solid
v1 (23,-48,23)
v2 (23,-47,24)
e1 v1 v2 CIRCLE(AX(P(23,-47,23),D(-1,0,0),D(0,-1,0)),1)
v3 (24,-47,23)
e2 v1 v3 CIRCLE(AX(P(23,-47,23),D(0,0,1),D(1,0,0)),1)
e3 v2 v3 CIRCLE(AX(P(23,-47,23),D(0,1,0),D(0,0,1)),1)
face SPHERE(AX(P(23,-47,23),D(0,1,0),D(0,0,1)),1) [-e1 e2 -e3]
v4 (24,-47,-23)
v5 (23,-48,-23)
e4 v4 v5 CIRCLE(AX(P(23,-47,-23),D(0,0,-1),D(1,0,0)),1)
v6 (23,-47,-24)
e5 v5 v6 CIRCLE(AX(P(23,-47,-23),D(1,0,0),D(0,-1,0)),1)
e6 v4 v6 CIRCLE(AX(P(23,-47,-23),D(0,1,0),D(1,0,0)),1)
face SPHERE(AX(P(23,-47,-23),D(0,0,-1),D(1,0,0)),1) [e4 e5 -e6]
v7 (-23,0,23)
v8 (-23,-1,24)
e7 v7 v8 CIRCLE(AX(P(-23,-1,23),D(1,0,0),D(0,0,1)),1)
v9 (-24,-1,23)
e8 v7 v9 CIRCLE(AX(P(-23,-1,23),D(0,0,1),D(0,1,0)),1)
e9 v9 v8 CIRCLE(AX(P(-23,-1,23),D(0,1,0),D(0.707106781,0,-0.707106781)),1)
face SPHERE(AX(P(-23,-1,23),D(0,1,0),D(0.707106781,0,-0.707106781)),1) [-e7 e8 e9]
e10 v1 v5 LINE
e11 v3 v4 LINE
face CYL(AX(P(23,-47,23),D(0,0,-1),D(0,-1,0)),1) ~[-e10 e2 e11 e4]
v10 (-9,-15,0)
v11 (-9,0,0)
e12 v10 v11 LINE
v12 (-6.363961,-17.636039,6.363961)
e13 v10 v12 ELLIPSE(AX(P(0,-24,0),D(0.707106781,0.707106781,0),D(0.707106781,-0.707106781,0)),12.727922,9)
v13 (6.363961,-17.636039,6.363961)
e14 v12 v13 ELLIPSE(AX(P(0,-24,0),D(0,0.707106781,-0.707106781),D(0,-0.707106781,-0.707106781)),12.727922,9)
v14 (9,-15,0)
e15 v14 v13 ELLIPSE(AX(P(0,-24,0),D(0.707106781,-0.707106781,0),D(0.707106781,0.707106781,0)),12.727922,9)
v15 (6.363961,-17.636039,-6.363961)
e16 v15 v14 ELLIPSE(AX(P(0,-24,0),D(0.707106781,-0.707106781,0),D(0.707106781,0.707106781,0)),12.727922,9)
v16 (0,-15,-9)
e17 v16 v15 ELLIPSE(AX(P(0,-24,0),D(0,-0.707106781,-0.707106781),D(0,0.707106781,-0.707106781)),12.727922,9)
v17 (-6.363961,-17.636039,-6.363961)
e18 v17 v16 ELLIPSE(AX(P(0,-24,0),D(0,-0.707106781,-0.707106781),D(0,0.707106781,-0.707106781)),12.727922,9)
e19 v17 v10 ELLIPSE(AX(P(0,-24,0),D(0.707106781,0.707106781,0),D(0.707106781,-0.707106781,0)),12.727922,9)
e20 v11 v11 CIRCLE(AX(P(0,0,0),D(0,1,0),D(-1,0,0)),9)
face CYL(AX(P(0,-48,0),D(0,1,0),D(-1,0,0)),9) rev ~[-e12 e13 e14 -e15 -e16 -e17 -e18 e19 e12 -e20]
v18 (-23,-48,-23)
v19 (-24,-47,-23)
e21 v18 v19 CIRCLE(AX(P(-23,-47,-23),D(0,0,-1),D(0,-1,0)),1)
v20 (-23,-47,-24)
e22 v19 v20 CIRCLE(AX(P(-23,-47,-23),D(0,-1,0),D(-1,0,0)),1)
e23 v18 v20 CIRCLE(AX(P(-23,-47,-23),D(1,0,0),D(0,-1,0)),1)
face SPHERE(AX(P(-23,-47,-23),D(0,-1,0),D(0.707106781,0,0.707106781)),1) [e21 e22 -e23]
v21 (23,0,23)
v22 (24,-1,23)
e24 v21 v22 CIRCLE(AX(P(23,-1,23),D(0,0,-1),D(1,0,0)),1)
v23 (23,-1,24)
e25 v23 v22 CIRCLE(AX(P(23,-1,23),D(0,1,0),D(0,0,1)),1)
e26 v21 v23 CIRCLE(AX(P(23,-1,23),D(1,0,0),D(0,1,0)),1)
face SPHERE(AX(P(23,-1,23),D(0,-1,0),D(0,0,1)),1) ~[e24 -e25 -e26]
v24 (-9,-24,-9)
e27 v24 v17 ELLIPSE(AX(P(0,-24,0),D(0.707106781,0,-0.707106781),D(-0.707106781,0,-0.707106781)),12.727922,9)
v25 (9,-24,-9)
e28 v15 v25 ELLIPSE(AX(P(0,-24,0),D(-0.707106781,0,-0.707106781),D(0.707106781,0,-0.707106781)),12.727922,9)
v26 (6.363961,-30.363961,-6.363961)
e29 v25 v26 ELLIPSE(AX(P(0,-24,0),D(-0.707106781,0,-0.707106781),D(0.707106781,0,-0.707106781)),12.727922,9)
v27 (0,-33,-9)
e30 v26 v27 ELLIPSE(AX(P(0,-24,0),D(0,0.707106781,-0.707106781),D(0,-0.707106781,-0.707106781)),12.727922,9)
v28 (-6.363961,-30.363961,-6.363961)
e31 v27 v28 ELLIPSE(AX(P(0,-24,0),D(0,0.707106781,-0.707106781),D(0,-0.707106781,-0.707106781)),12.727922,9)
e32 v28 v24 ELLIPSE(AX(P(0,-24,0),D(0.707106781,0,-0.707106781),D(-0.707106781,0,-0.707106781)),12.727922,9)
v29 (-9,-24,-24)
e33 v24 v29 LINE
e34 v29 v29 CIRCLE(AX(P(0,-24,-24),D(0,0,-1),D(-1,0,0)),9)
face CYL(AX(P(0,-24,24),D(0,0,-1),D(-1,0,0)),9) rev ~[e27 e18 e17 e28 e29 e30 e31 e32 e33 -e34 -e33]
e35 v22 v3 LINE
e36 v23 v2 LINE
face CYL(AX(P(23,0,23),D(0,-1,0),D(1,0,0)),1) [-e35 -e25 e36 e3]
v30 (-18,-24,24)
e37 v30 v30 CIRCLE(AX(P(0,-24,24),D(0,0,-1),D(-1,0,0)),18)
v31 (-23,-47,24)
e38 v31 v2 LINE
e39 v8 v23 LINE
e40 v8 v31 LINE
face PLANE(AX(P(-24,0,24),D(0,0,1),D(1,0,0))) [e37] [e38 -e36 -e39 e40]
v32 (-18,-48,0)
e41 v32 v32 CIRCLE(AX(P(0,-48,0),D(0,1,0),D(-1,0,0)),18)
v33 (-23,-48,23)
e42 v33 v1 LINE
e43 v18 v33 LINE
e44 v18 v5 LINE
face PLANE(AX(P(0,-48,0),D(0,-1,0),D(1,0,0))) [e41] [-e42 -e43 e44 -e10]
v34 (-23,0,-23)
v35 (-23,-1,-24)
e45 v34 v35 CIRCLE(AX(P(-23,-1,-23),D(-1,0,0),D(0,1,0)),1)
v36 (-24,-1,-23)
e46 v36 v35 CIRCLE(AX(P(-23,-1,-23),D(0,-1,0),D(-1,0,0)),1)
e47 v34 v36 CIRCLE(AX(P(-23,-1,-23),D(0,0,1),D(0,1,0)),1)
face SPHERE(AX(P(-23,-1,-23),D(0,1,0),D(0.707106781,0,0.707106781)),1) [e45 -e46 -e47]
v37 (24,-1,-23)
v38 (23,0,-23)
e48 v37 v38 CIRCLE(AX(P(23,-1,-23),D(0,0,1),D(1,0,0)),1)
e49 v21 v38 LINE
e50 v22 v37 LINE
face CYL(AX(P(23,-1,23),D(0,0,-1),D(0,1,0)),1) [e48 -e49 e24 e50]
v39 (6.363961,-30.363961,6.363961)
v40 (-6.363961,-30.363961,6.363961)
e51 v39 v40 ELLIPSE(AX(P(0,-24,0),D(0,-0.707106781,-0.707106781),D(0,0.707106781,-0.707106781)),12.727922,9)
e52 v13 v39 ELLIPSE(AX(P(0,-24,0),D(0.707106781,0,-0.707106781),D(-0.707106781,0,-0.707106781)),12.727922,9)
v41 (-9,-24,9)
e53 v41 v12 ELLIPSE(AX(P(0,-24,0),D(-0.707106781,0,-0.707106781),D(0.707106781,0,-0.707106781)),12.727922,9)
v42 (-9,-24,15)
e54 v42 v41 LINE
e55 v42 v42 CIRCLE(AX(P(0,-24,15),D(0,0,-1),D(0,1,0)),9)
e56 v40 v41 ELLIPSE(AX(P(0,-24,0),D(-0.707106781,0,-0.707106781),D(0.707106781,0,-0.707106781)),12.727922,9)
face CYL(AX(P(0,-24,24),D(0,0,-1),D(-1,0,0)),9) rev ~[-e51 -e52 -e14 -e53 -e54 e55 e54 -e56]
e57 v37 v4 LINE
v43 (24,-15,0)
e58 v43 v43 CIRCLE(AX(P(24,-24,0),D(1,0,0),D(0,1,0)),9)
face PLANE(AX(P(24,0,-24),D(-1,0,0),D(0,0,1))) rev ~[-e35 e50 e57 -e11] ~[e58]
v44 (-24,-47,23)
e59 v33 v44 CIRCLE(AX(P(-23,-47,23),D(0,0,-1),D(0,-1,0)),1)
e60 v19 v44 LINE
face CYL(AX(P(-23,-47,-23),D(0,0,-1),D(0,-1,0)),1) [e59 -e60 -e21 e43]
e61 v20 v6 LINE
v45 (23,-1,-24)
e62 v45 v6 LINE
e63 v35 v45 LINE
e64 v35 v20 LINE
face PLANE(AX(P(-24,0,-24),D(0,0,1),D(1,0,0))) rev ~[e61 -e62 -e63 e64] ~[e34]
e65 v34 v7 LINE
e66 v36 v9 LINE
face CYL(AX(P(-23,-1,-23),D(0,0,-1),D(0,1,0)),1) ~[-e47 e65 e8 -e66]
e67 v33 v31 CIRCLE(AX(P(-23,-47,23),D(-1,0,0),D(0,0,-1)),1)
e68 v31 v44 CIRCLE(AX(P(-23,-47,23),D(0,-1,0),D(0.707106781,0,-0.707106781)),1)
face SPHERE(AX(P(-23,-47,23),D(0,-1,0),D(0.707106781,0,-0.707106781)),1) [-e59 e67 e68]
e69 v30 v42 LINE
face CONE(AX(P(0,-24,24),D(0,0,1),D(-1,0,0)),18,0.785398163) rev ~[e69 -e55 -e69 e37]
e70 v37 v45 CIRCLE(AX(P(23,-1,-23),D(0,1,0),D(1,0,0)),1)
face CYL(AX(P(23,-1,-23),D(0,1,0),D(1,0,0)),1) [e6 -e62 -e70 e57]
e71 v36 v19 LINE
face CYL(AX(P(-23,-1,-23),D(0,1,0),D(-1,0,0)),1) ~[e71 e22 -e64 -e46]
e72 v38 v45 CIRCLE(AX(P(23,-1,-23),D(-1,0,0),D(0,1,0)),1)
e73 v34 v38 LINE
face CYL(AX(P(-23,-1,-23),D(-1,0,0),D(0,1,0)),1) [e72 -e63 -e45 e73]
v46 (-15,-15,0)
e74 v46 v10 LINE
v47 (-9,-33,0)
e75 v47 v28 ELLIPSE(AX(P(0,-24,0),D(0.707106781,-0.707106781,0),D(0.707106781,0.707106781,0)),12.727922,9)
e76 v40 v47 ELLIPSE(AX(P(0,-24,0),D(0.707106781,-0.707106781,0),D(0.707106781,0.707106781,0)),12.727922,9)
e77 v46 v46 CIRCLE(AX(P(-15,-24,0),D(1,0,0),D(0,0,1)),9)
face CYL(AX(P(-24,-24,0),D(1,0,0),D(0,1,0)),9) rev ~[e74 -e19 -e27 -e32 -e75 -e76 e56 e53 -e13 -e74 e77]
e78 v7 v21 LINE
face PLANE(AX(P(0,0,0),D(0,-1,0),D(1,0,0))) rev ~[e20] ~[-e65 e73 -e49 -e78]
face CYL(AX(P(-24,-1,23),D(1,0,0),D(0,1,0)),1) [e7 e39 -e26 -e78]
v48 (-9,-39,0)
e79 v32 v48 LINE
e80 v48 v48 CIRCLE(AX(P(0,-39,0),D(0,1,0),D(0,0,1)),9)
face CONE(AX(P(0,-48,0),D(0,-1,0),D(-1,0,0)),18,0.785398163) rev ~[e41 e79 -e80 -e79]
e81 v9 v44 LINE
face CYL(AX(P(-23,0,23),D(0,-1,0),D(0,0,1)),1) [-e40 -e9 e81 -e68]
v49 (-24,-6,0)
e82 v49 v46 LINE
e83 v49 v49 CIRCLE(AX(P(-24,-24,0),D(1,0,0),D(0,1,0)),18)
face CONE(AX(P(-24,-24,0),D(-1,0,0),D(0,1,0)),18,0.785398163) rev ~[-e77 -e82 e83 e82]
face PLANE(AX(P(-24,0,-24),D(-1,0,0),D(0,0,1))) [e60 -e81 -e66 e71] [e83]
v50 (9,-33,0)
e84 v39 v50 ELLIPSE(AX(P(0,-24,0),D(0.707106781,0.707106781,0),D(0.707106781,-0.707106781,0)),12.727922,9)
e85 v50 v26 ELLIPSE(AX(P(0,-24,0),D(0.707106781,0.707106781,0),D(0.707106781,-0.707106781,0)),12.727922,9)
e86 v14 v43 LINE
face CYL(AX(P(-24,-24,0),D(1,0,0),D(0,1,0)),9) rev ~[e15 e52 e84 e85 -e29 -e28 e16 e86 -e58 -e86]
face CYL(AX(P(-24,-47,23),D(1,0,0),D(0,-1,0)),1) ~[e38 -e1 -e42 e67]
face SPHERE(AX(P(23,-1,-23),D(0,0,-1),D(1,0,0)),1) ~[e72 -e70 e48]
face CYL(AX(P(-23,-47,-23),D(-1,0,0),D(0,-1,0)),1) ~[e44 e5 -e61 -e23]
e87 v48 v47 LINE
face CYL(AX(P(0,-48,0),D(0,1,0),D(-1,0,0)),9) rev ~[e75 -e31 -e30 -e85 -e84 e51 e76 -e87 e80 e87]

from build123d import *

# Parameters (mm, degrees)
F0_W            = 48
F0_H            = 48
F1_DEPTH        = 48
F2_R            = 1
F3_R            = 1
F4_T1_DEPTH     = 46
F4_T3_DEPTH     = 46
F4_T5_DEPTH     = 46
F4_S9_W         = 1
F4_S9_H         = 1
F4_T10_DEPTH    = 1
F4_S15_W        = 1
F4_S15_H        = 1
F4_T16_DEPTH    = 1
F4_S21_W        = 1
F4_S21_H        = 1
F4_T22_DEPTH    = 1
F4_S27_W        = 1
F4_S27_H        = 1
F4_T28_DEPTH    = 1
F4_T32_ANGLE    = 90
F4_T34_ANGLE    = 90
F6_D            = 18
F6_CSINK_D      = 36
F6_CSINK_ANGLE  = 90
F8_D            = 18
F8_CSINK_D      = 36
F8_CSINK_ANGLE  = 90
F10_D           = 18
F10_CSINK_D     = 36
F10_CSINK_ANGLE = 90


# Not quite as in the source:
# - a fillet or chamfer that OpenCascade refuses, or shapes differently, is made with other operations: its cross-section is extruded or revolved along the edge and cut away or added


with BuildPart() as f1:
    # F0 (on Front) → F1 (new body)
    with BuildSketch(Plane.XZ):
        Rectangle(F0_W, F0_H)
    extrude(amount=F1_DEPTH)

    # F2
    f2_edges = [f1.edges().sort_by_distance(p)[0] for p in [
        (24, -24, 24),
    ]]
    fillet(f2_edges, radius=F2_R)

    # F3
    f3_edges = [f1.edges().sort_by_distance(p)[0] for p in [
        (-24, -24, 24),
        (-0.5, 0, 24),
        (-0.5, -48, 24),
    ]]
    fillet(f3_edges, radius=F3_R)

    # F4: fillet of radius 1 on 8 edges, made by hand

    # F4_s2 → F4_t1 (cut)
    with BuildSketch(Plane.XY.offset(-23)):
        with BuildLine():
            ThreePointArc((-23, -48), (-23.7071067812, -47.7071067812), (-24, -47))
            Line((-24, -47), (-24, -48))
            Line((-24, -48), (-23, -48))
        make_face()
        with BuildLine():
            ThreePointArc((-23, 0), (-23.7071067812, -0.2928932188), (-24, -1))
            Line((-24, -1), (-24, 0))
            Line((-24, 0), (-23, 0))
        make_face()
    extrude(amount=F4_T1_DEPTH, mode=Mode.SUBTRACT)

    # F4_s4 → F4_t3 (cut)
    with BuildSketch(Plane.YZ.offset(-23)):
        with BuildLine():
            ThreePointArc((0, -23), (-0.2928932188, -23.7071067812), (-1, -24))
            Line((-1, -24), (0, -24))
            Line((0, -24), (0, -23))
        make_face()
        with BuildLine():
            ThreePointArc((-48, -23), (-47.7071067812, -23.7071067812), (-47, -24))
            Line((-47, -24), (-48, -24))
            Line((-48, -24), (-48, -23))
        make_face()
    extrude(amount=F4_T3_DEPTH, mode=Mode.SUBTRACT)

    # F4_s6 → F4_t5 (cut)
    with BuildSketch(Plane.XZ.offset(1)):
        with BuildLine():
            ThreePointArc((-24, -23), (-23.7071067812, -23.7071067812), (-23, -24))
            Line((-23, -24), (-24, -24))
            Line((-24, -24), (-24, -23))
        make_face()
        with BuildLine():
            ThreePointArc((24, -23), (23.7071067812, -23.7071067812), (23, -24))
            Line((23, -24), (24, -24))
            Line((24, -24), (24, -23))
        make_face()
    extrude(amount=F4_T5_DEPTH, mode=Mode.SUBTRACT)


with BuildPart() as f4_tool8:
    # F4_s9 → F4_t10 (new body)
    with BuildSketch(Plane.XZ.offset(1)):
        with Locations((-23.5, 23.5)):
            Rectangle(F4_S9_W, F4_S9_H)
    extrude(amount=-F4_T10_DEPTH)

    # F4_s11 → F4_t12 (revolve, cut)
    with BuildSketch(Plane(origin=(-23, -1, 23), x_dir=(0.7071067812, 0, -0.7071067812), z_dir=(0.7071067812, 0, 0.7071067812))):
        with BuildLine():
            ThreePointArc((0, -1), (1, 0), (0, 1))
            Line((0, 1), (0, -1))
        make_face()
    revolve(axis=Axis((-23, -1, 23), (0, 1, 0)), mode=Mode.SUBTRACT)


with BuildPart() as f1_1:
    add(f1.part)

    # F4_t7: cut F4_tool8
    add(f4_tool8.part, mode=Mode.SUBTRACT)


with BuildPart() as f4_tool14:
    # F4_s15 → F4_t16 (new body)
    with BuildSketch(Plane.XZ.offset(47)):
        with Locations((-23.5, 23.5)):
            Rectangle(F4_S15_W, F4_S15_H)
    extrude(amount=F4_T16_DEPTH)

    # F4_s17 → F4_t18 (revolve, cut)
    with BuildSketch(Plane(origin=(-23, -47, 23), x_dir=(0.7071067812, 0, -0.7071067812), z_dir=(-0.7071067812, 0, -0.7071067812))):
        with BuildLine():
            ThreePointArc((0, -1), (1, 0), (0, 1))
            Line((0, 1), (0, -1))
        make_face()
    revolve(axis=Axis((-23, -47, 23), (0, -1, 0)), mode=Mode.SUBTRACT)


with BuildPart() as f1_2:
    add(f1_1.part)

    # F4_t13: cut F4_tool14
    add(f4_tool14.part, mode=Mode.SUBTRACT)


with BuildPart() as f4_tool20:
    # F4_s21 → F4_t22 (new body)
    with BuildSketch(Plane.XZ.offset(47)):
        with Locations((-23.5, -23.5)):
            Rectangle(F4_S21_W, F4_S21_H)
    extrude(amount=F4_T22_DEPTH)

    # F4_s23 → F4_t24 (revolve, cut)
    with BuildSketch(Plane(origin=(-23, -47, -23), x_dir=(0.7071067812, 0, 0.7071067812), z_dir=(0.7071067812, 0, -0.7071067812))):
        with BuildLine():
            ThreePointArc((0, -1), (1, 0), (0, 1))
            Line((0, 1), (0, -1))
        make_face()
    revolve(axis=Axis((-23, -47, -23), (0, -1, 0)), mode=Mode.SUBTRACT)


with BuildPart() as f1_3:
    add(f1_2.part)

    # F4_t19: cut F4_tool20
    add(f4_tool20.part, mode=Mode.SUBTRACT)


with BuildPart() as f4_tool26:
    # F4_s27 → F4_t28 (new body)
    with BuildSketch(Plane.XZ.offset(1)):
        with Locations((-23.5, -23.5)):
            Rectangle(F4_S27_W, F4_S27_H)
    extrude(amount=-F4_T28_DEPTH)

    # F4_s29 → F4_t30 (revolve, cut)
    with BuildSketch(Plane(origin=(-23, -1, -23), x_dir=(0.7071067812, 0, 0.7071067812), z_dir=(-0.7071067812, 0, 0.7071067812))):
        with BuildLine():
            ThreePointArc((0, -1), (1, 0), (0, 1))
            Line((0, 1), (0, -1))
        make_face()
    revolve(axis=Axis((-23, -1, -23), (0, 1, 0)), mode=Mode.SUBTRACT)


with BuildPart() as f1_4:
    add(f1_3.part)

    # F4_t25: cut F4_tool26
    add(f4_tool26.part, mode=Mode.SUBTRACT)

    # F4_s31 → F4_t32 (revolve, cut)
    with BuildSketch(Plane.XZ.offset(1)):
        with BuildLine():
            ThreePointArc((24, -23), (23.7071067812, -23.7071067812), (23, -24))
            Line((23, -24), (24, -24))
            Line((24, -24), (24, -23))
        make_face()
    revolve(axis=Axis((23, -1, -24), (0, 0, 1)), revolution_arc=F4_T32_ANGLE, mode=Mode.SUBTRACT)

    # F4_s33 → F4_t34 (revolve, cut)
    with BuildSketch(Plane.XZ.offset(47)):
        with BuildLine():
            ThreePointArc((24, -23), (23.7071067812, -23.7071067812), (23, -24))
            Line((23, -24), (24, -24))
            Line((24, -24), (24, -23))
        make_face()
    revolve(axis=Axis((23, -47, -24), (0, 0, -1)), revolution_arc=F4_T34_ANGLE, mode=Mode.SUBTRACT)

    # F6 (through all)
    with Locations(Plane.XY.offset(24)):
        with Locations((0, -24)):
            CounterSinkHole(F6_D / 2, F6_CSINK_D / 2, counter_sink_angle=F6_CSINK_ANGLE)

    # F8 (through all)
    with Locations(Plane(origin=(-24, 0, 0), x_dir=(0, -1, 0), z_dir=(-1, 0, 0))):
        with Locations((24, 0)):
            CounterSinkHole(F8_D / 2, F8_CSINK_D / 2, counter_sink_angle=F8_CSINK_ANGLE)

    # F10 (through all)
    with Locations(Plane.XZ.offset(48)):
        with Locations((0, 0)):
            CounterSinkHole(F10_D / 2, F10_CSINK_D / 2, counter_sink_angle=F10_CSINK_ANGLE)


solid = f1_4.part
